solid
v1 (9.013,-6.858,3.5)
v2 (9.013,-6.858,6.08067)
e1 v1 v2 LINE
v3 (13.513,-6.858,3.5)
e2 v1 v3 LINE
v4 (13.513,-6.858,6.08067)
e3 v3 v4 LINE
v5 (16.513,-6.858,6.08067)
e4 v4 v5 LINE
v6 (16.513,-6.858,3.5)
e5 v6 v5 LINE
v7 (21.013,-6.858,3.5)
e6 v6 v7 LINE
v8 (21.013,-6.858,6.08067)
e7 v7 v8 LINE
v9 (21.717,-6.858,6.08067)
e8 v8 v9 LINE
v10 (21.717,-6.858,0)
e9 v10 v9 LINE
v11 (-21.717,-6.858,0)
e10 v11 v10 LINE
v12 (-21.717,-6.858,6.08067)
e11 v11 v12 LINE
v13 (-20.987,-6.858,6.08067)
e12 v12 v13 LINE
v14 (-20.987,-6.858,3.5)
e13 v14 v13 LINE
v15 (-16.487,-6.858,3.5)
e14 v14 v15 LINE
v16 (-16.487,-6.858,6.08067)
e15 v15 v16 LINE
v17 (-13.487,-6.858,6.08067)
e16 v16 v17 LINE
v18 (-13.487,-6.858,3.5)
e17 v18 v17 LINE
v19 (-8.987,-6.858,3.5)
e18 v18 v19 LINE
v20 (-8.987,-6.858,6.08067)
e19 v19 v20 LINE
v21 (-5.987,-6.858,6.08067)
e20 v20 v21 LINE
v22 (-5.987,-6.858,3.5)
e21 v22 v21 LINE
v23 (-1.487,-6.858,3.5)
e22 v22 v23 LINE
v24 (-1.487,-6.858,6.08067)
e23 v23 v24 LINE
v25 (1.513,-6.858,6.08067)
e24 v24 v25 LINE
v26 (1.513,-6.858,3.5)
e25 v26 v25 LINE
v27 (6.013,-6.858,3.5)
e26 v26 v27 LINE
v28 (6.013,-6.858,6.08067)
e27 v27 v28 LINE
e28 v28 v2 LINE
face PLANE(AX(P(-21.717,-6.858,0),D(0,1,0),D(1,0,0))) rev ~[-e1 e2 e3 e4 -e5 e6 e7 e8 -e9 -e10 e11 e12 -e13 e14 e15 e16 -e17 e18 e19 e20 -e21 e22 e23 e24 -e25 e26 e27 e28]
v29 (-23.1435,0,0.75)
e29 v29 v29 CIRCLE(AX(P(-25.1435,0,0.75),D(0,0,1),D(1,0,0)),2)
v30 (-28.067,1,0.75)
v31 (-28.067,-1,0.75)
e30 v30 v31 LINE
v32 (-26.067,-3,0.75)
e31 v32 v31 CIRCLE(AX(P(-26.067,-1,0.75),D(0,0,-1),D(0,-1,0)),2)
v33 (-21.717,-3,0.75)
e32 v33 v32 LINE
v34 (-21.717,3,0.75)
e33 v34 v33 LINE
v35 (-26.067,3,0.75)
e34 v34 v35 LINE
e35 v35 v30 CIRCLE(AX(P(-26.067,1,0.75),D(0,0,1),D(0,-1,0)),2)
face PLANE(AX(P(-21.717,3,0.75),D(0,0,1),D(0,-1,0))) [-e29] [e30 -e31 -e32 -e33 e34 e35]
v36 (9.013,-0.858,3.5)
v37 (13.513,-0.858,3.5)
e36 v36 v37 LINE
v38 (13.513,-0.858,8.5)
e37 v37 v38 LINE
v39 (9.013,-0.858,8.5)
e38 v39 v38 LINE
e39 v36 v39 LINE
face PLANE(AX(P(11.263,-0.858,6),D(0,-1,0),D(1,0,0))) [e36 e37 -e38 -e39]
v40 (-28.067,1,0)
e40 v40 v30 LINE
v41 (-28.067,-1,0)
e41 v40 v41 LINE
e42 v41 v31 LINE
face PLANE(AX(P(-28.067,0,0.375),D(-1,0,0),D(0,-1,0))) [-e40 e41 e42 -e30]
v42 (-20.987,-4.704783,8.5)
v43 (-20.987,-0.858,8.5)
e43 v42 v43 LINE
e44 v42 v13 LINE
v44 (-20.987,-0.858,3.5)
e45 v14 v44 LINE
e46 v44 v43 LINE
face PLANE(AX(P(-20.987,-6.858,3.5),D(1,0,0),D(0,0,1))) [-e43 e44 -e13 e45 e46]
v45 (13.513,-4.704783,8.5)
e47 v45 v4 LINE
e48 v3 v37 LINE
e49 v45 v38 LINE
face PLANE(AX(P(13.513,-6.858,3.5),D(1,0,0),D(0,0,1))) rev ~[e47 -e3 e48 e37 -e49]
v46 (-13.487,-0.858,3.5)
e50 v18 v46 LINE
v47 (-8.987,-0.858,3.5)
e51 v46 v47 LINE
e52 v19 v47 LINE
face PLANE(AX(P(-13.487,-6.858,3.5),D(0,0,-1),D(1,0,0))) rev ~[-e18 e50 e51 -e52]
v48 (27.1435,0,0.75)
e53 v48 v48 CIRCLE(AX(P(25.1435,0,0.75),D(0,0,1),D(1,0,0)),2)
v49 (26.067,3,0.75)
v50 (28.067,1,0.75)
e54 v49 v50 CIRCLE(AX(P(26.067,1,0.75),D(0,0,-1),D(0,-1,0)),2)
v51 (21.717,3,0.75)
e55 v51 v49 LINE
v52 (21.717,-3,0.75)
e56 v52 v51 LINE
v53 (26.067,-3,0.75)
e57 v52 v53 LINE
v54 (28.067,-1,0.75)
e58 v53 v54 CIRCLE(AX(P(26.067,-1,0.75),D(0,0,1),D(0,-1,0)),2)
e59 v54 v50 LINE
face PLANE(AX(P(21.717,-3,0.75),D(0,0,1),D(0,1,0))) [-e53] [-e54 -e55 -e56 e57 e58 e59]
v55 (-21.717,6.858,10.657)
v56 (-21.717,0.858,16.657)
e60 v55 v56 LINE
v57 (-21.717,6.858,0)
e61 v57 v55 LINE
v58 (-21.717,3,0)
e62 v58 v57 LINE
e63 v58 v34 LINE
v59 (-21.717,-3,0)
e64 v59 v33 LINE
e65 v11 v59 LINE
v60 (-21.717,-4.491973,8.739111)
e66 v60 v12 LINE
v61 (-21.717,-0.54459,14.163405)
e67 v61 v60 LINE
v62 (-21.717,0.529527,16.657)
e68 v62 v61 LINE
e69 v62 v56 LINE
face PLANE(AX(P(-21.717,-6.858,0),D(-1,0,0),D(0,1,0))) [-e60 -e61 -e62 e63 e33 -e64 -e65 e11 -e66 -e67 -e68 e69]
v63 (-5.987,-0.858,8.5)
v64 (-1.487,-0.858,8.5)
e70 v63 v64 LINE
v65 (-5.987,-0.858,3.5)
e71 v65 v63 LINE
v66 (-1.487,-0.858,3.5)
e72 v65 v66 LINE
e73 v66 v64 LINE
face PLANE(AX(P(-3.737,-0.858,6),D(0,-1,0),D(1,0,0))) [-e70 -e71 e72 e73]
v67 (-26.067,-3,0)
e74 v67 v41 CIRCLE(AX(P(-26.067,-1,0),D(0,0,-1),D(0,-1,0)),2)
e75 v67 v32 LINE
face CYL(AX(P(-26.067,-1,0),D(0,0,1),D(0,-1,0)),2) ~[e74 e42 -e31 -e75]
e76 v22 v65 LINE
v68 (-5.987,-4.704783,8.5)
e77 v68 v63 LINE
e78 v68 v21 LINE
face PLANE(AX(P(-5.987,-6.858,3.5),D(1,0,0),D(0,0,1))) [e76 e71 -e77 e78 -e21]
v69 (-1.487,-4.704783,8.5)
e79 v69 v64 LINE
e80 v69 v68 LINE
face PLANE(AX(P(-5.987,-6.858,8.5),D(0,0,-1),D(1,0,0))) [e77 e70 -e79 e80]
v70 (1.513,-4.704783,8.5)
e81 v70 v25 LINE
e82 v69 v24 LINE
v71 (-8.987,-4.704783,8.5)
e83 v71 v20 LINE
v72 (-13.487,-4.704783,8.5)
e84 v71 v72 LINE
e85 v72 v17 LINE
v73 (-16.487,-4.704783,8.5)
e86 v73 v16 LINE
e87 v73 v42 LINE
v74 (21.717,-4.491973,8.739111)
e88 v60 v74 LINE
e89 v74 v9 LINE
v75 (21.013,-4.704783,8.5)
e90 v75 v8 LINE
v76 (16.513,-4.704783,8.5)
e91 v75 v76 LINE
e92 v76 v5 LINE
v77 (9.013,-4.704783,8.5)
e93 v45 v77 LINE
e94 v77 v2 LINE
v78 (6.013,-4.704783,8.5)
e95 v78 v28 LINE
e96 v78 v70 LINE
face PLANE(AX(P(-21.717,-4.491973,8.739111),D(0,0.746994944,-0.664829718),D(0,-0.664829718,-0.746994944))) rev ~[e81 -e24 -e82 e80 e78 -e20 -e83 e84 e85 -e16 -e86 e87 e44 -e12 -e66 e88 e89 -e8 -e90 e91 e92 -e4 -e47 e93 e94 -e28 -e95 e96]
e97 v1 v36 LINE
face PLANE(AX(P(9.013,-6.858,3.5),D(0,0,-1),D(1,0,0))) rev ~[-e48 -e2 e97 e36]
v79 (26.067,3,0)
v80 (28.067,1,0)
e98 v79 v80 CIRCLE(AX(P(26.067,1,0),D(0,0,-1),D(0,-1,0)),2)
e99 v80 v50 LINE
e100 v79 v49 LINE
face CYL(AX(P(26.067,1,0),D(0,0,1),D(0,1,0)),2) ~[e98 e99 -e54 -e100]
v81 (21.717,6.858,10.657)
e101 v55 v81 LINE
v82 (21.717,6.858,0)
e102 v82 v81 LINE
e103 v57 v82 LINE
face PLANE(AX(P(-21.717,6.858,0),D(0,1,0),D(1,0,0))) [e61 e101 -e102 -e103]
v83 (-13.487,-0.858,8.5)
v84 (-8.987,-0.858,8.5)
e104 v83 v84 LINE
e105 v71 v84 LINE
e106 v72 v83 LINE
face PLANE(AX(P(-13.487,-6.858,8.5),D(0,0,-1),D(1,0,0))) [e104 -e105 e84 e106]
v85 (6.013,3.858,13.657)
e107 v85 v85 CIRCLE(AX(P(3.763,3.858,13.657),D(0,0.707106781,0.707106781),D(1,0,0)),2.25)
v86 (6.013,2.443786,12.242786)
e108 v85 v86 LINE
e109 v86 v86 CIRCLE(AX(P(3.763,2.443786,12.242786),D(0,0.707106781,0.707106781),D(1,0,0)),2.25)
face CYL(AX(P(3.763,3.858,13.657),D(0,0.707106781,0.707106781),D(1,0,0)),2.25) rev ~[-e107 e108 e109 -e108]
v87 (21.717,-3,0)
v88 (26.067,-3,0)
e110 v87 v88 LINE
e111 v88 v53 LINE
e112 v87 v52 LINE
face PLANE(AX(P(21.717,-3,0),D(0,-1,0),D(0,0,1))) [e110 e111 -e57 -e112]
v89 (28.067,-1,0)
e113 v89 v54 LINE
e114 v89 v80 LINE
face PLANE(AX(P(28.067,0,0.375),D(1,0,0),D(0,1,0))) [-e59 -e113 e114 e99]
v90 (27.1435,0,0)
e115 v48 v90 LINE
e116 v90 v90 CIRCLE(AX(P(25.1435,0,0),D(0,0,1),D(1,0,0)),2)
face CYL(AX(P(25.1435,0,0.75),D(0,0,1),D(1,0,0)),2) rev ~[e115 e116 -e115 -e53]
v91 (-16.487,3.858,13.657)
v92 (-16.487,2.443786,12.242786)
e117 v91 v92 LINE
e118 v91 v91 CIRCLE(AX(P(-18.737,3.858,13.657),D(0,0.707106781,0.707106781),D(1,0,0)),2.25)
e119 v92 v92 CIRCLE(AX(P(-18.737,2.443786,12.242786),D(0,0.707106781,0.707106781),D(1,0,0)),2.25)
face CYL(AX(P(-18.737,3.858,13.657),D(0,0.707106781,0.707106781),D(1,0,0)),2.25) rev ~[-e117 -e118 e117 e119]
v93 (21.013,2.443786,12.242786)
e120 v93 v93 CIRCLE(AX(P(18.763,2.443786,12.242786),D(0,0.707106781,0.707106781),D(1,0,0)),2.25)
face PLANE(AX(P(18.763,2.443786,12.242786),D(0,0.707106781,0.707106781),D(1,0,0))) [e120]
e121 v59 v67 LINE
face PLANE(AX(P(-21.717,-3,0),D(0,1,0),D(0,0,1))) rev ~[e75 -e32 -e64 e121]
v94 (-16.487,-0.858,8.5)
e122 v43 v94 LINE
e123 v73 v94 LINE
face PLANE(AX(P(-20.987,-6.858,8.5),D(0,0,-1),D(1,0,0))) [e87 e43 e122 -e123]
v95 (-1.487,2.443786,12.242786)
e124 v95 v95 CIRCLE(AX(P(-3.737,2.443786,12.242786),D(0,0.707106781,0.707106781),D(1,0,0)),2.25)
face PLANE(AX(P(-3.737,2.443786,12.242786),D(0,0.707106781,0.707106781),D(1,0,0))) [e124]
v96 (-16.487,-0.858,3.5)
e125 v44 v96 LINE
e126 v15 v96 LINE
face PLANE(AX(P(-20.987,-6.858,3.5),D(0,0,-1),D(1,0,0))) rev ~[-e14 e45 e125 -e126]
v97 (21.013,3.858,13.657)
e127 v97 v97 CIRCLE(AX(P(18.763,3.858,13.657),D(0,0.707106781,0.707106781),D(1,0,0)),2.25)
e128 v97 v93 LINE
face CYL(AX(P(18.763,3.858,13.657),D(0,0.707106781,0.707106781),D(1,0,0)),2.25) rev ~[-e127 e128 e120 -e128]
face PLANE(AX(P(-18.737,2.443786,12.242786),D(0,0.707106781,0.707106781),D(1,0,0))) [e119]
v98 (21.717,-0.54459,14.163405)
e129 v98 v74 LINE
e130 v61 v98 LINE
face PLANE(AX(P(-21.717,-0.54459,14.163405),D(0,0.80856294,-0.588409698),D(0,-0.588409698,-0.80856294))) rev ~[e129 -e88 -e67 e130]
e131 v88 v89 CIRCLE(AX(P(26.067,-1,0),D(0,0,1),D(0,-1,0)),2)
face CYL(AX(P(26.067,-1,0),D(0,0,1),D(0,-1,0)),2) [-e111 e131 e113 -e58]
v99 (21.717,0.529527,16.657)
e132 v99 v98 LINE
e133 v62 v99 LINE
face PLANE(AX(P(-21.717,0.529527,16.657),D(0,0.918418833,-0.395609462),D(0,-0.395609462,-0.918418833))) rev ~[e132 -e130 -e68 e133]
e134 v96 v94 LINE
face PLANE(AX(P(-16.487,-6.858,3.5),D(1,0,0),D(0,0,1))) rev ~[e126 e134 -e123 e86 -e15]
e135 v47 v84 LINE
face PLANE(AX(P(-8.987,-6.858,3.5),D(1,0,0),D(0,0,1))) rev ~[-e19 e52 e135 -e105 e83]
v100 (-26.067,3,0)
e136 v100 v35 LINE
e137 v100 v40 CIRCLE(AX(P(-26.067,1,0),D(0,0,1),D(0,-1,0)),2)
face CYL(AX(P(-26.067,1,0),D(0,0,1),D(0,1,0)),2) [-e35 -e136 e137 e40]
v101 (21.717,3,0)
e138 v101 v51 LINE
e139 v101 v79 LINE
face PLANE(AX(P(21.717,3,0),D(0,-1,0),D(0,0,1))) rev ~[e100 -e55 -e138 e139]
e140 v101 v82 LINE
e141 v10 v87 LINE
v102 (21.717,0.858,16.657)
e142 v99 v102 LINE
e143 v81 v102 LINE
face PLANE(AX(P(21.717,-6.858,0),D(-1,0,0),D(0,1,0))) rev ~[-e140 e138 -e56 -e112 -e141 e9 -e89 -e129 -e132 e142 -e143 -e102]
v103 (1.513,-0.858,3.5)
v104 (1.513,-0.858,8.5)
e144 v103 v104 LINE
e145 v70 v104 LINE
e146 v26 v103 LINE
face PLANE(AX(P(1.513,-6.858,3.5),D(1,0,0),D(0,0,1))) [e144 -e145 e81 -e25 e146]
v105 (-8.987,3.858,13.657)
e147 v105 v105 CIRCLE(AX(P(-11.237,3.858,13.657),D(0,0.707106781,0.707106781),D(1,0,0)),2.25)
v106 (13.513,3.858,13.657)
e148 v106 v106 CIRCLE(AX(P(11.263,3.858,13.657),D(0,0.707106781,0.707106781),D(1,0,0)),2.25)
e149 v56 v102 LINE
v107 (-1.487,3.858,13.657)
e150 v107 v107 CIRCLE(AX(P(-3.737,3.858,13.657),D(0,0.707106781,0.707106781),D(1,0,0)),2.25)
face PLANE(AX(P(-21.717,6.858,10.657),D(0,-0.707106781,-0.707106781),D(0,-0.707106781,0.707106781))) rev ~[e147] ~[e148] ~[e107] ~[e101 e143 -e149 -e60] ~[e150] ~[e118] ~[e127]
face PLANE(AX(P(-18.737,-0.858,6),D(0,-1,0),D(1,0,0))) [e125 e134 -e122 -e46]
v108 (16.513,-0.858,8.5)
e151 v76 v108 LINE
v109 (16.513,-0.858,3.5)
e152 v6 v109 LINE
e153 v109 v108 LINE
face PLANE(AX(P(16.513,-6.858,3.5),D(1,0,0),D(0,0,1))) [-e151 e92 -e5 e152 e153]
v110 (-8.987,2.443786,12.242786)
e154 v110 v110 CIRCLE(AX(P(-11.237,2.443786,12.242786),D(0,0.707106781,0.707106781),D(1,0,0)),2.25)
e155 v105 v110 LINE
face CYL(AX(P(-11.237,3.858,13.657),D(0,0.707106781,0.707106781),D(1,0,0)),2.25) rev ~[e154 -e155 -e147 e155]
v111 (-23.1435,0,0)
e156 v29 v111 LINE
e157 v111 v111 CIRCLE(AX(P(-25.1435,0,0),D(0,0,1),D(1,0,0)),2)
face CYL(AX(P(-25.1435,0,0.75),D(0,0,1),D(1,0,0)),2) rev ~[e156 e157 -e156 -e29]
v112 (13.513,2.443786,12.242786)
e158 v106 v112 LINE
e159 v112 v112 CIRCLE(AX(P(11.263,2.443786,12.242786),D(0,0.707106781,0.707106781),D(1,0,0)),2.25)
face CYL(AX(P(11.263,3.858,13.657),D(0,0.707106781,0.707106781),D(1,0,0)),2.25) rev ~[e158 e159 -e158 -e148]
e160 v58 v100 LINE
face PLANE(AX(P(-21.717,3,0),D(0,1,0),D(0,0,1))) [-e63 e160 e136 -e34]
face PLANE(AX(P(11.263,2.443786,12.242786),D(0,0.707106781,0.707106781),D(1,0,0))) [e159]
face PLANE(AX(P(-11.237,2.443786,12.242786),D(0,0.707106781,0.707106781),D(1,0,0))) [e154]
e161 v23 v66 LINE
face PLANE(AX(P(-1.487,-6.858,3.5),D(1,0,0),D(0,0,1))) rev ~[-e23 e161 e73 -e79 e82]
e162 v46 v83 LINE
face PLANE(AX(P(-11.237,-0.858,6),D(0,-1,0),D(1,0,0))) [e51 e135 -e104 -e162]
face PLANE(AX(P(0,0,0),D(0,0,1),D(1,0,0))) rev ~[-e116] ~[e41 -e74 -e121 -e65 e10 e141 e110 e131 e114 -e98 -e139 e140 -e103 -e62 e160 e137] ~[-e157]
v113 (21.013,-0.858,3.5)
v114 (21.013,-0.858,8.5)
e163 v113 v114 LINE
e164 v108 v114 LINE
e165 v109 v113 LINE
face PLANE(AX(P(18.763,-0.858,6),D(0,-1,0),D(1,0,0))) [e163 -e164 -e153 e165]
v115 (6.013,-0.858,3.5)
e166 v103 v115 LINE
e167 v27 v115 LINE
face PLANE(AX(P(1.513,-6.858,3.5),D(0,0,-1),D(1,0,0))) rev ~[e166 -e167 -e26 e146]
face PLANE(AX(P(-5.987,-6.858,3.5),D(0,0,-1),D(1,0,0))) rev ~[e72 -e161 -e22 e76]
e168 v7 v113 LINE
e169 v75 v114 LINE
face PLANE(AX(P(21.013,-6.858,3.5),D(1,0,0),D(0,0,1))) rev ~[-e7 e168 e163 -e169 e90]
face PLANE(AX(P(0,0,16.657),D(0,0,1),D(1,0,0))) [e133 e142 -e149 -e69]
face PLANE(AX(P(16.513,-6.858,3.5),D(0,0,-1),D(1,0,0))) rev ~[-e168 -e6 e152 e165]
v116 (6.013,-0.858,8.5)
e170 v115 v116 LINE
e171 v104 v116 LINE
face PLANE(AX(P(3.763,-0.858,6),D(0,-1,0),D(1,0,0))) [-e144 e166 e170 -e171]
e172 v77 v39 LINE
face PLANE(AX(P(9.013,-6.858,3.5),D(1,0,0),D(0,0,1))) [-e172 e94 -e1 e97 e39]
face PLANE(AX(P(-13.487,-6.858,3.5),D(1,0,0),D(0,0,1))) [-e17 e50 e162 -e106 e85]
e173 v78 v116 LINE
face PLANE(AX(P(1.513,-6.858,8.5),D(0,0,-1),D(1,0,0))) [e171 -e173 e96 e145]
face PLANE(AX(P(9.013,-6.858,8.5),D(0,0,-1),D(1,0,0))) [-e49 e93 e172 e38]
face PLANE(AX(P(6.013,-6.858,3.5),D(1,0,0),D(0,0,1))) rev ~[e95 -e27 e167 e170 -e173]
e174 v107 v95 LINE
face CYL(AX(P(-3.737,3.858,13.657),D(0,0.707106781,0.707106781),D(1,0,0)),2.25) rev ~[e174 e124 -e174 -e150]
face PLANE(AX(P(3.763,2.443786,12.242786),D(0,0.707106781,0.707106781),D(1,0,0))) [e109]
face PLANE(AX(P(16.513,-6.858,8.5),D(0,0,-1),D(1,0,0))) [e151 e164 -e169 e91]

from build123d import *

# Parameters (mm, degrees)
F0_W      = 43.434
F0_H      = 13.716
F1_DEPTH  = 16.657
F3_DEPTH  = 43.435
F4_W      = 4.5
F4_H      = 5
F5_DEPTH  = 6
F6_R      = 2.25
F7_DEPTH  = 2
F8_W      = 6
F8_H      = 0.75
F9_DEPTH  = 6.35
F10_W     = 6
F10_H     = 0.75
F11_DEPTH = 6.35
F12_R     = 2
F13_R     = 2
F14_DEPTH = 0.751
F15_R     = 2
F16_DEPTH = 0.751


# Not quite as in the source:
# - a feature names something its author has since deleted; it is built from what else it names


with BuildPart() as f1:
    # F0 (on Top) → F1 (new body)
    with BuildSketch(Plane.XY):
        Rectangle(F0_W, F0_H)
    extrude(amount=F1_DEPTH)

    # F2 (on face) → F3 (cut, through all)
    with BuildSketch(Plane(origin=(-21.717, 0, 0), x_dir=(0, -1, 0), z_dir=(-1, 0, 0))):
        Polygon((-6.858, 10.657), (-0.858, 16.657), (-6.858, 16.657), align=None)
        Polygon((6.858, 16.657), (-0.5295271985, 16.657), (0.5445904681, 14.1634047031), (4.491972737, 8.7391110137), (6.858, 6.0806702822), align=None)
    extrude(amount=-F3_DEPTH, mode=Mode.SUBTRACT)

    # F4 (on face) → F5 (cut)
    with BuildSketch(Plane.XZ.offset(6.858)):
        with Locations((-18.737, 6)):
            Rectangle(F4_W, F4_H)
        with Locations((-11.237, 6)):
            Rectangle(F4_W, F4_H)
        with Locations((-3.737, 6)):
            Rectangle(F4_W, F4_H)
        with Locations((3.763, 6)):
            Rectangle(F4_W, F4_H)
        with Locations((11.263, 6)):
            Rectangle(F4_W, F4_H)
        with Locations((18.763, 6)):
            Rectangle(F4_W, F4_H)
        with Locations((26.263, 6)):
            Rectangle(F4_W, F4_H)
        with Locations((33.763, 6)):
            Rectangle(F4_W, F4_H)
        with Locations((41.263, 6)):
            Rectangle(F4_W, F4_H)
        with Locations((48.763, 6)):
            Rectangle(F4_W, F4_H)
        with Locations((56.263, 6)):
            Rectangle(F4_W, F4_H)
        with Locations((63.763, 6)):
            Rectangle(F4_W, F4_H)
    extrude(amount=-F5_DEPTH, mode=Mode.SUBTRACT)

    # F6 (on face) → F7 (cut)
    with BuildSketch(Plane(origin=(0, 8.7575, 8.7575), x_dir=(1, 0, 0), z_dir=(0, 0.7071067812, 0.7071067812))):
        with Locations((-18.737, -6.9289393488)):
            Circle(F6_R)
        with Locations((-11.237, -6.9289393488)):
            Circle(F6_R)
        with Locations((-3.737, -6.9289393488)):
            Circle(F6_R)
        with Locations((3.763, -6.9289393488)):
            Circle(F6_R)
        with Locations((11.263, -6.9289393488)):
            Circle(F6_R)
        with Locations((18.763, -6.9289393488)):
            Circle(F6_R)
        with Locations((26.263, -6.9289393488)):
            Circle(F6_R)
        with Locations((33.763, -6.9289393488)):
            Circle(F6_R)
        with Locations((41.263, -6.9289393488)):
            Circle(F6_R)
        with Locations((48.763, -6.9289393488)):
            Circle(F6_R)
        with Locations((56.263, -6.9289393488)):
            Circle(F6_R)
        with Locations((63.763, -6.9289393488)):
            Circle(F6_R)
    extrude(amount=-F7_DEPTH, mode=Mode.SUBTRACT)

    # F8 (on face) → F9 (join)
    with BuildSketch(Plane(origin=(-21.717, 0, 0), x_dir=(0, -1, 0), z_dir=(-1, 0, 0))):
        with Locations((0, 0.375)):
            Rectangle(F8_W, F8_H)
    extrude(amount=F9_DEPTH)

    # F10 (on face) → F11 (join)
    with BuildSketch(Plane.YZ.offset(21.717)):
        with Locations((0, 0.375)):
            Rectangle(F10_W, F10_H)
    extrude(amount=F11_DEPTH)

    # F12
    f12_edges = [f1.edges().sort_by_distance(p)[0] for p in [
        (-28.067, 3, 0.375),
        (-28.067, -3, 0.375),
        (28.067, -3, 0.375),
        (28.067, 3, 0.375),
    ]]
    fillet(f12_edges, radius=F12_R)

    # F13 (on face) → F14 (cut, through all)
    with BuildSketch(Plane.XY.offset(0.75)):
        with Locations((-25.1435, 0)):
            Circle(F13_R)
    extrude(amount=-F14_DEPTH, mode=Mode.SUBTRACT)

    # F15 (on face) → F16 (cut, through all)
    with BuildSketch(Plane.XY.offset(0.75)):
        with Locations((25.1435, 0)):
            Circle(F15_R)
    extrude(amount=-F16_DEPTH, mode=Mode.SUBTRACT)


solid = f1.part
